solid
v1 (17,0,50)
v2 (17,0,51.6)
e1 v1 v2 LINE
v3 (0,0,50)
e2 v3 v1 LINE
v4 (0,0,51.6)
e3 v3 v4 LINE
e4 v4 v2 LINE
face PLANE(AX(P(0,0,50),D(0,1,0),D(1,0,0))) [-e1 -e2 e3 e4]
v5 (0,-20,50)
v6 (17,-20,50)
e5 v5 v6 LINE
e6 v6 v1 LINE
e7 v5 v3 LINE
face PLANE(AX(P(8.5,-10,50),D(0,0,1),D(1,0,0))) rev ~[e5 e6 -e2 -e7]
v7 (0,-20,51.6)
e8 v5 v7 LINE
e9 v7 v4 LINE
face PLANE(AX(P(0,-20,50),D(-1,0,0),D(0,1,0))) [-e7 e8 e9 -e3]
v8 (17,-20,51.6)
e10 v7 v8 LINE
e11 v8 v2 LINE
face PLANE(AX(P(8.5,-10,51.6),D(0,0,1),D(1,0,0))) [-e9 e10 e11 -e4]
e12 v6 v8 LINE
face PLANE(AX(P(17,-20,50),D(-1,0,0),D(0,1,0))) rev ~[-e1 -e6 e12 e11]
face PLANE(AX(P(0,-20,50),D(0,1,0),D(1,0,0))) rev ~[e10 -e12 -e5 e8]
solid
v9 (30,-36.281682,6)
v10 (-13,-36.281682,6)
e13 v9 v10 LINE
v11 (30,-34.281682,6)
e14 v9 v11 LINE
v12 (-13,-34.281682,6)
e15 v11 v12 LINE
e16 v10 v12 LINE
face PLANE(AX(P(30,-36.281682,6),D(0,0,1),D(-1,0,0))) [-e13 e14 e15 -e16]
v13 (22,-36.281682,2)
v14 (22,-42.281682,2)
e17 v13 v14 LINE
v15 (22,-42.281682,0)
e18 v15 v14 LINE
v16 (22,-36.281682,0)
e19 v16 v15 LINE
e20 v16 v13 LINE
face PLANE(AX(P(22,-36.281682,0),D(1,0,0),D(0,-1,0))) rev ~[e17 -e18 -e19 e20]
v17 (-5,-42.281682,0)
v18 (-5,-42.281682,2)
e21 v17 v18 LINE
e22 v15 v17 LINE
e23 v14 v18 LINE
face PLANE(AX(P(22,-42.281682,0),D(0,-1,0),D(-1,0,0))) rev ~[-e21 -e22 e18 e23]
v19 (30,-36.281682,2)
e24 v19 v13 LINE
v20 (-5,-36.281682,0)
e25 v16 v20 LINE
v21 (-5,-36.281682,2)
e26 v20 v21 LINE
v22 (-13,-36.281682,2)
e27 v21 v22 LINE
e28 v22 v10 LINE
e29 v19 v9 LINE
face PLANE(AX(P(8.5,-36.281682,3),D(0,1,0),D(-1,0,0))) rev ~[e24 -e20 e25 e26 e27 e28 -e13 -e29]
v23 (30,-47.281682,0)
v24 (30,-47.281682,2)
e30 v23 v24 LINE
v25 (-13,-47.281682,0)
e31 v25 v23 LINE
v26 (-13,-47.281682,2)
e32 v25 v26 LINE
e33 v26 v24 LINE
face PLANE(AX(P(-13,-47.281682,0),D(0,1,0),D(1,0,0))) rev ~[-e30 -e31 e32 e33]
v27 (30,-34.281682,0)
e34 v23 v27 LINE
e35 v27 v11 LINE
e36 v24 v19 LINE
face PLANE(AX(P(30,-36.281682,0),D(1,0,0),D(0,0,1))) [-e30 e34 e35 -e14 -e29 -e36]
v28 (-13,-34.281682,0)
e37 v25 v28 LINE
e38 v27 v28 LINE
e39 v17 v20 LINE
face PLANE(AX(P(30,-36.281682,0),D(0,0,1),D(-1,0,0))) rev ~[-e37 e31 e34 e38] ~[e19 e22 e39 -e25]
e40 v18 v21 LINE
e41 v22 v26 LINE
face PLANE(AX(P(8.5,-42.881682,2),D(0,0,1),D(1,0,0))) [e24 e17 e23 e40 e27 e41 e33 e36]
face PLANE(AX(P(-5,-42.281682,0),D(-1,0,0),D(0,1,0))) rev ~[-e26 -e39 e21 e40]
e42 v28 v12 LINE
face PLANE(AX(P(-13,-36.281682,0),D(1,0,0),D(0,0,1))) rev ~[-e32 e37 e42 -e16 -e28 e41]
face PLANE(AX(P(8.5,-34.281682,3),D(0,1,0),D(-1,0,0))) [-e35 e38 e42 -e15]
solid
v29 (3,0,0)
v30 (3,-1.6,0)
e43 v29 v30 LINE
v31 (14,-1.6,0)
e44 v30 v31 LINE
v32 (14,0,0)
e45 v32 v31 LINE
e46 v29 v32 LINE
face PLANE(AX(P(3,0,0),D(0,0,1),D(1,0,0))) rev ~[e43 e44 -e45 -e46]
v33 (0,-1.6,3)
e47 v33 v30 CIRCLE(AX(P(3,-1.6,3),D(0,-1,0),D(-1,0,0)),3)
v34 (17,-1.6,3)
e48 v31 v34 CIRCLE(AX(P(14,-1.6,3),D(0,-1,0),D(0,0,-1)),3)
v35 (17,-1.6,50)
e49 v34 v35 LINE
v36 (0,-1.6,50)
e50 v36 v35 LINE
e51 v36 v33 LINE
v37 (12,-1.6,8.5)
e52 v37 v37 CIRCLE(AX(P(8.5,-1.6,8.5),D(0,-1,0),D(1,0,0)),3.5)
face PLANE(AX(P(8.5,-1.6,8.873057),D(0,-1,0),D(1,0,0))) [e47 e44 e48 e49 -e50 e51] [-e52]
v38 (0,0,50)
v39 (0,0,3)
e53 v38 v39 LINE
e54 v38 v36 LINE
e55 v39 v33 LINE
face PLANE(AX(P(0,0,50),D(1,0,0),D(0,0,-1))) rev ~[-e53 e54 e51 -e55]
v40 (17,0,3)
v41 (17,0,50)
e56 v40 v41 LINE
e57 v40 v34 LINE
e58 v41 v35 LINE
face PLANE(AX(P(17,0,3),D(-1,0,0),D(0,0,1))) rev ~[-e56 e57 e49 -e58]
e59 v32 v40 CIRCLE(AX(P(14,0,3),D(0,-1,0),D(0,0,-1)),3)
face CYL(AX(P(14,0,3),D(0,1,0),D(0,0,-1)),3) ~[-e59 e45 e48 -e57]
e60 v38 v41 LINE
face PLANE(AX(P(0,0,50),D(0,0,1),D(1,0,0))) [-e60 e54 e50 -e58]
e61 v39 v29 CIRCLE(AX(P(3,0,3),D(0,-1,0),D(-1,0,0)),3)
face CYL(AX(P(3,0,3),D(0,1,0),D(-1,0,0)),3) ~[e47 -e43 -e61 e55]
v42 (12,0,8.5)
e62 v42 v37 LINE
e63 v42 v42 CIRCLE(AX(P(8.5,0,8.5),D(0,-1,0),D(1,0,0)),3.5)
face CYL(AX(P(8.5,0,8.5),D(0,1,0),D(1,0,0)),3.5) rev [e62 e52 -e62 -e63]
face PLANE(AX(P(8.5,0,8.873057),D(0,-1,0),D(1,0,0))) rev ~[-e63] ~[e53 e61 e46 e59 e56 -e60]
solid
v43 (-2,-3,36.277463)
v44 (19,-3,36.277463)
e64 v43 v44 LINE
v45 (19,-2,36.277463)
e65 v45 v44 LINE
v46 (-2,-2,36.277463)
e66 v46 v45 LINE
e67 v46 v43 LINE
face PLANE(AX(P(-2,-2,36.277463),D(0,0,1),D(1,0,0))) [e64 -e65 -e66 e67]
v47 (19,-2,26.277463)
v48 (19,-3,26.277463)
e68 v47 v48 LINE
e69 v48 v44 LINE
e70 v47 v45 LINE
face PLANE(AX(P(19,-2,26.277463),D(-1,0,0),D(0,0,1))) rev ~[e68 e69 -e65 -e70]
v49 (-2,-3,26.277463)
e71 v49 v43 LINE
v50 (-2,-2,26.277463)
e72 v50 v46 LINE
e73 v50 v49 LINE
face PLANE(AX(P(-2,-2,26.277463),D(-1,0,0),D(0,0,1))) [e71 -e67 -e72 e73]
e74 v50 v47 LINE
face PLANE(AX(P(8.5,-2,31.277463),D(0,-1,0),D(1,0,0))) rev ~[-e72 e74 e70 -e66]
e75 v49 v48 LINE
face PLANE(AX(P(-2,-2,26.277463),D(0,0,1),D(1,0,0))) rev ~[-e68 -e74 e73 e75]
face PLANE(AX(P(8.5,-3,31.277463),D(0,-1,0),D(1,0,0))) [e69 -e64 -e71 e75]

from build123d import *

# Parameters (mm, degrees)
F8_DEPTH  = 2
F7_W      = 43
F7_H      = 6
F9_DEPTH  = 2
F2_R      = 3.5
F2_W      = 17
F2_H      = 5
F2_H_2    = 28
F10_DEPTH = 1.6
F4_W      = 17
F4_H      = 20
F11_DEPTH = 1.6
F1_W      = 21
F1_H      = 10
F12_DEPTH = 1


# Not quite as in the source:
# - a feature names something its author has since deleted; it is built from what else it names


with BuildPart() as f8:
    # F5 (on Top) → F8 (new body)
    with BuildSketch(Plane.XY):
        Polygon((-5, -36.2816824913), (-13, -36.2816824913), (-13, -47.2816824913), (30, -47.2816824913), (30, -36.2816824913), (22, -36.2816824913), (22, -42.2816824913), (-5, -42.2816824913), align=None)
    extrude(amount=F8_DEPTH)

    # F7 (on line) → F9 (join)
    with BuildSketch(Plane(origin=(0, -36.2816824913, 0), x_dir=(-1, 0, 0), z_dir=(0, 1, 0))):
        with Locations((-8.5, 3)):
            Rectangle(F7_W, F7_H)
    extrude(amount=F9_DEPTH)


with BuildPart() as f10:
    # F2 (on Front) → F10 (new body)
    with BuildSketch(Plane.XZ):
        with BuildLine():
            Line((17, 17), (0, 17))
            Line((0, 17), (0, 3))
            ThreePointArc((0, 3), (0.8786796564, 0.8786796564), (3, 0))
            Line((3, 0), (14, 0))
            ThreePointArc((14, 0), (16.1213203436, 0.8786796564), (17, 3))
            Line((17, 3), (17, 17))
        make_face()
        with Locations((8.5, 8.5)):
            Circle(F2_R, mode=Mode.SUBTRACT)
        with Locations((8.5, 19.5)):
            Rectangle(F2_W, F2_H)
        with Locations((8.5, 36)):
            Rectangle(F2_W, F2_H_2)
    extrude(amount=F10_DEPTH)


with BuildPart() as f11:
    # F4 (on line) → F11 (new body)
    with BuildSketch(Plane.XY.offset(50)):
        with Locations((8.5, -10)):
            Rectangle(F4_W, F4_H)
    extrude(amount=F11_DEPTH)


with BuildPart() as f12:
    # F1 (on offset) → F12 (new body)
    with BuildSketch(Plane.XZ.offset(2)):
        with Locations((8.5, 31.2774626663)):
            Rectangle(F1_W, F1_H)
    extrude(amount=F12_DEPTH)


solid = Compound([f8.part, f10.part, f11.part, f12.part])
